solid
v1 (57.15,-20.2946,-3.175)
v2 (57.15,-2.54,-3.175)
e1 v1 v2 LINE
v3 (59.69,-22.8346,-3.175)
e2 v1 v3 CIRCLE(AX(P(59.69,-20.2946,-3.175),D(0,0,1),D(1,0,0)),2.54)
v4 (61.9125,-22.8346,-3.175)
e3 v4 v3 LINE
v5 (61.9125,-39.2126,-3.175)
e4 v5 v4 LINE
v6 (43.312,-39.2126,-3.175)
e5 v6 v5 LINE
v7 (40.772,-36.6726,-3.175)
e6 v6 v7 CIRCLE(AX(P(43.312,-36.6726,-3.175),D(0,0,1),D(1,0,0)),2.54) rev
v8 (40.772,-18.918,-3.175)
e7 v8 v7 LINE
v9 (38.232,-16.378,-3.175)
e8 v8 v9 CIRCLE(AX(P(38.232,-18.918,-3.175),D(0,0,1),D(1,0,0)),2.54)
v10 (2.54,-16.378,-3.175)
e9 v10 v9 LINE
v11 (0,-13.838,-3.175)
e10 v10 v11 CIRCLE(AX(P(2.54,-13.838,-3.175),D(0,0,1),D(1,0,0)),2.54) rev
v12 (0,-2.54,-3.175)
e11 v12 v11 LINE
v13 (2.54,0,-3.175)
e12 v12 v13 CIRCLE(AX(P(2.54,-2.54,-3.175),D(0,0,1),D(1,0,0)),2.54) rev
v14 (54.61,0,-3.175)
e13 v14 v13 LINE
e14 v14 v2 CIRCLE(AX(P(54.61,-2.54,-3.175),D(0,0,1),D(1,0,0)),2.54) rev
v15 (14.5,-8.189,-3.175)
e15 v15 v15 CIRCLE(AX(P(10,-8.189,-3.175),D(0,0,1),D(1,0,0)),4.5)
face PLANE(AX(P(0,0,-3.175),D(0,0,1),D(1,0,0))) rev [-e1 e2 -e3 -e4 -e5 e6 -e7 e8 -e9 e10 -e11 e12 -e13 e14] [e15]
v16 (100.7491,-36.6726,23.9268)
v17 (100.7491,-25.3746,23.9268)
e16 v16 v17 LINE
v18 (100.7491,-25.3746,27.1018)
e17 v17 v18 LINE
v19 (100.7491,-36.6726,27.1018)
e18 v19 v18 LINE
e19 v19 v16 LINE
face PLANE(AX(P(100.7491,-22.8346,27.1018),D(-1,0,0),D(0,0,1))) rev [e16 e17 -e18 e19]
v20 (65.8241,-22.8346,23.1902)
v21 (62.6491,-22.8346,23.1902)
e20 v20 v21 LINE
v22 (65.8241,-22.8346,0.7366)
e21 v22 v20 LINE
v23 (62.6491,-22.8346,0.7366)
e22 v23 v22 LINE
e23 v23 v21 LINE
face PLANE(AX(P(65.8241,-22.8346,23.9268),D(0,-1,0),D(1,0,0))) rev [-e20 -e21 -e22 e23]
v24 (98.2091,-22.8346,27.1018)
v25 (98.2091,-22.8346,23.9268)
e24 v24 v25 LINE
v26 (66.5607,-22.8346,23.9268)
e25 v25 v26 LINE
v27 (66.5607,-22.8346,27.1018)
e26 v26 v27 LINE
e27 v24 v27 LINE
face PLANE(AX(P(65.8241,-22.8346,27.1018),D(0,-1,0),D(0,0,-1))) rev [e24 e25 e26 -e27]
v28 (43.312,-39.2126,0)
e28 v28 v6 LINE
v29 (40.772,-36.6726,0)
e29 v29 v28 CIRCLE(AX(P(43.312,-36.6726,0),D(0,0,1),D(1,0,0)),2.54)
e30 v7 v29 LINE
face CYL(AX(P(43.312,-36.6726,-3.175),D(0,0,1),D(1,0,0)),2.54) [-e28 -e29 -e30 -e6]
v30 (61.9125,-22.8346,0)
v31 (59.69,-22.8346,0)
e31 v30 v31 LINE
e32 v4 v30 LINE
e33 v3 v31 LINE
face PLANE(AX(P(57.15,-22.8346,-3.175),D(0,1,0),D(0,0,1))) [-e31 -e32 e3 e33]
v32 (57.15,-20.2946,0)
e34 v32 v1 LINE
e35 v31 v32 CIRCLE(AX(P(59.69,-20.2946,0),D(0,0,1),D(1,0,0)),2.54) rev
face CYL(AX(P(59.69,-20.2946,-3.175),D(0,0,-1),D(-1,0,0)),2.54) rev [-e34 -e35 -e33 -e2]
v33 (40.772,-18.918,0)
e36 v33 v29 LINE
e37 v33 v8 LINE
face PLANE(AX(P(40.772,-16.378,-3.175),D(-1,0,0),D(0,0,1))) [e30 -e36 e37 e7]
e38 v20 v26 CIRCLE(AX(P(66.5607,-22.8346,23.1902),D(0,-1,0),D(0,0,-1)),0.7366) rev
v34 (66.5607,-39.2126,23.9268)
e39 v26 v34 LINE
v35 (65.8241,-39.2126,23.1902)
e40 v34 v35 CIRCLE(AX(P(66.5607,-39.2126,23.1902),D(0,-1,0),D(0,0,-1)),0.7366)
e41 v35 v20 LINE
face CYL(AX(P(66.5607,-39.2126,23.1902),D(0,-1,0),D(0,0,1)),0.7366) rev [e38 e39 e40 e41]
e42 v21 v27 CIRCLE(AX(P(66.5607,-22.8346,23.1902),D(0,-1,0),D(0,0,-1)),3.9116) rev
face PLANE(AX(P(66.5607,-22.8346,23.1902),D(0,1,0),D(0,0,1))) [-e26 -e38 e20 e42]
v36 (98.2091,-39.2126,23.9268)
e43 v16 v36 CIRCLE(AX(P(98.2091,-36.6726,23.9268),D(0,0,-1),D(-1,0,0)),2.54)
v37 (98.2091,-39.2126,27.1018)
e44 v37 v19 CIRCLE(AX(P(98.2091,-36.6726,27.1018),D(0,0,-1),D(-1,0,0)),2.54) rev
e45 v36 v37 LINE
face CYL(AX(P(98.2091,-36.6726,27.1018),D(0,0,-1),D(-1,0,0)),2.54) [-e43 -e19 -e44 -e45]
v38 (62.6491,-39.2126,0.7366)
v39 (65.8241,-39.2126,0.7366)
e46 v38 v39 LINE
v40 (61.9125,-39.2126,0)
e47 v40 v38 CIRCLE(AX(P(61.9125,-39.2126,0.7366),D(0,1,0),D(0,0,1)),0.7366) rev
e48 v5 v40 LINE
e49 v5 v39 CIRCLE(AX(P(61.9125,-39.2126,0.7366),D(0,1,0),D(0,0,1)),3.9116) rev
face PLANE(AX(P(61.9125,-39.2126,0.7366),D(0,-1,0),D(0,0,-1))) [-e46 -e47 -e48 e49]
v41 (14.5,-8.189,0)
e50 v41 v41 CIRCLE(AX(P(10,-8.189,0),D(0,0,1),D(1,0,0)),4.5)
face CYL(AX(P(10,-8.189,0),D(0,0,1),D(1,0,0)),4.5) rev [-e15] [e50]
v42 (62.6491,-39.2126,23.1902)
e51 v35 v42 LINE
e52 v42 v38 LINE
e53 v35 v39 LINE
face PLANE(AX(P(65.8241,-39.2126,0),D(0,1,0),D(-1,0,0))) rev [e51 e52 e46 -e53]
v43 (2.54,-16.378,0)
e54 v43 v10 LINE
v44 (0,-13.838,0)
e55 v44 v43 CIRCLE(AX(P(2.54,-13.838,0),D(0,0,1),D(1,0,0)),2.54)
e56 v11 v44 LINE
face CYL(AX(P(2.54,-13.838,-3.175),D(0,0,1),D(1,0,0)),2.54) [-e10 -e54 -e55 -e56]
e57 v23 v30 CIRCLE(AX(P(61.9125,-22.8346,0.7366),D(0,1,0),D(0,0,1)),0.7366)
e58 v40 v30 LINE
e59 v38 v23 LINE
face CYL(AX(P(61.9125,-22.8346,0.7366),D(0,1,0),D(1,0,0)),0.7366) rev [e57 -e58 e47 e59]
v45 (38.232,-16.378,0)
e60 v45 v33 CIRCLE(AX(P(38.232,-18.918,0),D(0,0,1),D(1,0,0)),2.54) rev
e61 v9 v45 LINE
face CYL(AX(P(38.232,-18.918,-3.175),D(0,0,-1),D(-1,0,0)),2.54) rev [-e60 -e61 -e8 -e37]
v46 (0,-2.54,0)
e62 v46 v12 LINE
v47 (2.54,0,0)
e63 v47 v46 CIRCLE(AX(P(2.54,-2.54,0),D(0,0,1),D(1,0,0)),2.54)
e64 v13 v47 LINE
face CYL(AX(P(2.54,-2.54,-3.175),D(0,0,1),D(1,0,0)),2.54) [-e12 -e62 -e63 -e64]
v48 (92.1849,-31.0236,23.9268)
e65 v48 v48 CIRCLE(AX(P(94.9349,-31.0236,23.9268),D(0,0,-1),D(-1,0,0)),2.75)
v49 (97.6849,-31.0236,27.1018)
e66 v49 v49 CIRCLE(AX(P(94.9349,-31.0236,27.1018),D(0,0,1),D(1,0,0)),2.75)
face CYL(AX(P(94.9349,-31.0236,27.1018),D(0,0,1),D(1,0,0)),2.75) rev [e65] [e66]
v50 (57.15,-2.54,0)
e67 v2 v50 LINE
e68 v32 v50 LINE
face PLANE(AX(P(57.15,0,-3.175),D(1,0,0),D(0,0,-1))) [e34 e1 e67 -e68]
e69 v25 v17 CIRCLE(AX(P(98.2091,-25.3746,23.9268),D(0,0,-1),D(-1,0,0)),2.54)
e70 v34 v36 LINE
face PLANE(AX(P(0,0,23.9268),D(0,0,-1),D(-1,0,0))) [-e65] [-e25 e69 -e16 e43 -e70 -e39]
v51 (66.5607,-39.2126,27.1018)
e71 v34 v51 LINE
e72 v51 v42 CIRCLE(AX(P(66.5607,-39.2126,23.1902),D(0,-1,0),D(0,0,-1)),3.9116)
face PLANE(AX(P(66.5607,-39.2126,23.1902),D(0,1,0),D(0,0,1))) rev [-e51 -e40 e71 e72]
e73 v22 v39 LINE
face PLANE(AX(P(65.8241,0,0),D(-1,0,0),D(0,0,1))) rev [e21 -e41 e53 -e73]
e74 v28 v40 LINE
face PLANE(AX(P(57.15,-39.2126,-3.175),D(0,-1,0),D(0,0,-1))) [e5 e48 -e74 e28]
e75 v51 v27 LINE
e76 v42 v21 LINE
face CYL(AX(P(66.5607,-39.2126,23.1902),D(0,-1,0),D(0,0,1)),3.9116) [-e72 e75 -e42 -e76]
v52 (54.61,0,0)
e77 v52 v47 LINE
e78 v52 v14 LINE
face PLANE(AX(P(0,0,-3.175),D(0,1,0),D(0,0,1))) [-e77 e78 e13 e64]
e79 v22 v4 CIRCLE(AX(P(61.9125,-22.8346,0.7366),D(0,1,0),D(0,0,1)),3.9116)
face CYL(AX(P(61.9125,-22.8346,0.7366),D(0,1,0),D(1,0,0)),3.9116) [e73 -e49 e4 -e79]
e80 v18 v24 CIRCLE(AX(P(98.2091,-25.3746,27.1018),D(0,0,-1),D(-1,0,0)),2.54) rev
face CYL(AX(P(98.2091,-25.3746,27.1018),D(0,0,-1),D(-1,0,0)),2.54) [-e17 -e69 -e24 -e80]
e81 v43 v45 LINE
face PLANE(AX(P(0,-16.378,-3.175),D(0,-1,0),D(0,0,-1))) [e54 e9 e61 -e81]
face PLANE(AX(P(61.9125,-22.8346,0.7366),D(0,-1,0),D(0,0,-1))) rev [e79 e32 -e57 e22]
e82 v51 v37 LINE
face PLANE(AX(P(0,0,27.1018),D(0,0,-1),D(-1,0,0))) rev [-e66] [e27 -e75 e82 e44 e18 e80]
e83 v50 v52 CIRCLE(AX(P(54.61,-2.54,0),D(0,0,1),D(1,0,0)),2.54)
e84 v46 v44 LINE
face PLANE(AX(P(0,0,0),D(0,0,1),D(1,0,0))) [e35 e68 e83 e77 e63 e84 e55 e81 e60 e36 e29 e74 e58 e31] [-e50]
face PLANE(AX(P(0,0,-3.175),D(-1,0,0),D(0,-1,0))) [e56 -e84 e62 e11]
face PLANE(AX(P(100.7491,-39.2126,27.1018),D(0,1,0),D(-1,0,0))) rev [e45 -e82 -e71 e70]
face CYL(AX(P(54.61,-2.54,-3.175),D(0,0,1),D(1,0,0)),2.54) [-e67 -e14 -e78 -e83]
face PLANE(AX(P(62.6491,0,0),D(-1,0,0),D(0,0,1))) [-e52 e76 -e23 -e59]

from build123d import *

# Parameters (mm, degrees)
BASE_FLANGE1_DEPTH           = 3.175
M8_CLEARANCE_HOLE1_D         = 9
EDGE_FLANGE1_DEPTH           = 16.378
EDGE_FLANGE2_STRIP_W         = 14.1732
EDGE_FLANGE2_STRIP_H         = 3.175
EDGE_FLANGE2_STRIP_CUT_DEPTH = 16.378
EDGE_FLANGE2_DEPTH           = 16.378
M5_CLEARANCE_HOLE1_D         = 5.5
FILLET1_R                    = 2.54


# Sheet-metal steps are written as plain solids
with BuildPart() as part:
    # Sketch1 → Base-Flange1 (new body)
    with BuildSketch(Plane.XY):
        Polygon((0, 0), (57.15, 0), (57.15, -16.378), (57.15, -22.8346), (61.9125, -22.8346), (61.9125, -39.2126), (57.15, -39.2126), (40.772, -39.2126), (40.772, -16.378), (0, -16.378), align=None)
    extrude(amount=-BASE_FLANGE1_DEPTH)

    # M8 Clearance Hole1 (through all)
    with Locations(Plane.XY):
        with Locations((10, -8.189)):
            Hole(M8_CLEARANCE_HOLE1_D / 2)

    # Edge-Flange1 section (across the edge) → Edge-Flange1 (add)
    with BuildSketch(Plane(origin=(62.6491, -39.2126, 0), x_dir=(-1, 0, 0), z_dir=(0, 1, 0))):
        with BuildLine():
            Line((-3.175, 0.7366), (-3.175, 23.9268))
            Line((-3.175, 23.9268), (0, 23.9268))
            Line((0, 23.9268), (0, 0.7366))
            ThreePointArc((0, 0.7366), (0.215745145, 0.215745145), (0.7366, 0))
            Line((0.7366, 0), (0.7366, -3.175))
            ThreePointArc((0.7366, -3.175), (-2.029318885, -2.029318885), (-3.175, 0.7366))
        make_face()
    extrude(amount=EDGE_FLANGE1_DEPTH)

    # Edge-Flange2 strip (across the edge) → Edge-Flange2 strip cut (cut)
    with BuildSketch(Plane(origin=(65.8241, -22.8346, 23.9268), x_dir=(0, 0, -1), z_dir=(0, -1, 0))):
        with Locations((-6.35, -1.5875)):
            Rectangle(EDGE_FLANGE2_STRIP_W, EDGE_FLANGE2_STRIP_H)
    extrude(amount=EDGE_FLANGE2_STRIP_CUT_DEPTH, mode=Mode.SUBTRACT)

    # Edge-Flange2 section (across the edge) → Edge-Flange2 (add)
    with BuildSketch(Plane(origin=(65.8241, -22.8346, 23.9268), x_dir=(0, 0, -1), z_dir=(0, -1, 0))):
        with BuildLine():
            Line((-3.175, 0.7366), (-3.175, 34.925))
            Line((-3.175, 34.925), (0, 34.925))
            Line((0, 34.925), (0, 0.7366))
            ThreePointArc((0, 0.7366), (0.215745145, 0.215745145), (0.7366, 0))
            Line((0.7366, 0), (0.7366, -3.175))
            ThreePointArc((0.7366, -3.175), (-2.029318885, -2.029318885), (-3.175, 0.7366))
        make_face()
    extrude(amount=EDGE_FLANGE2_DEPTH)

    # M5 Clearance Hole1 (through all)
    with Locations(Plane.XY.offset(27.1018)):
        with Locations((94.9349, -31.0236)):
            Hole(M5_CLEARANCE_HOLE1_D / 2)

    # Fillet1
    fillet1_edges = [part.edges().sort_by_distance(p)[0] for p in [
        (0, 0, -1.5875),
        (57.15, 0, -1.5875),
        (57.15, -22.8346, -1.5875),
        (40.772, -39.2126, -1.5875),
        (40.772, -16.378, -1.5875),
        (0, -16.378, -1.5875),
        (100.7491, -22.8346, 25.5143),
        (100.7491, -39.2126, 25.5143),
    ]]
    fillet(fillet1_edges, radius=FILLET1_R)


solid = part.part
